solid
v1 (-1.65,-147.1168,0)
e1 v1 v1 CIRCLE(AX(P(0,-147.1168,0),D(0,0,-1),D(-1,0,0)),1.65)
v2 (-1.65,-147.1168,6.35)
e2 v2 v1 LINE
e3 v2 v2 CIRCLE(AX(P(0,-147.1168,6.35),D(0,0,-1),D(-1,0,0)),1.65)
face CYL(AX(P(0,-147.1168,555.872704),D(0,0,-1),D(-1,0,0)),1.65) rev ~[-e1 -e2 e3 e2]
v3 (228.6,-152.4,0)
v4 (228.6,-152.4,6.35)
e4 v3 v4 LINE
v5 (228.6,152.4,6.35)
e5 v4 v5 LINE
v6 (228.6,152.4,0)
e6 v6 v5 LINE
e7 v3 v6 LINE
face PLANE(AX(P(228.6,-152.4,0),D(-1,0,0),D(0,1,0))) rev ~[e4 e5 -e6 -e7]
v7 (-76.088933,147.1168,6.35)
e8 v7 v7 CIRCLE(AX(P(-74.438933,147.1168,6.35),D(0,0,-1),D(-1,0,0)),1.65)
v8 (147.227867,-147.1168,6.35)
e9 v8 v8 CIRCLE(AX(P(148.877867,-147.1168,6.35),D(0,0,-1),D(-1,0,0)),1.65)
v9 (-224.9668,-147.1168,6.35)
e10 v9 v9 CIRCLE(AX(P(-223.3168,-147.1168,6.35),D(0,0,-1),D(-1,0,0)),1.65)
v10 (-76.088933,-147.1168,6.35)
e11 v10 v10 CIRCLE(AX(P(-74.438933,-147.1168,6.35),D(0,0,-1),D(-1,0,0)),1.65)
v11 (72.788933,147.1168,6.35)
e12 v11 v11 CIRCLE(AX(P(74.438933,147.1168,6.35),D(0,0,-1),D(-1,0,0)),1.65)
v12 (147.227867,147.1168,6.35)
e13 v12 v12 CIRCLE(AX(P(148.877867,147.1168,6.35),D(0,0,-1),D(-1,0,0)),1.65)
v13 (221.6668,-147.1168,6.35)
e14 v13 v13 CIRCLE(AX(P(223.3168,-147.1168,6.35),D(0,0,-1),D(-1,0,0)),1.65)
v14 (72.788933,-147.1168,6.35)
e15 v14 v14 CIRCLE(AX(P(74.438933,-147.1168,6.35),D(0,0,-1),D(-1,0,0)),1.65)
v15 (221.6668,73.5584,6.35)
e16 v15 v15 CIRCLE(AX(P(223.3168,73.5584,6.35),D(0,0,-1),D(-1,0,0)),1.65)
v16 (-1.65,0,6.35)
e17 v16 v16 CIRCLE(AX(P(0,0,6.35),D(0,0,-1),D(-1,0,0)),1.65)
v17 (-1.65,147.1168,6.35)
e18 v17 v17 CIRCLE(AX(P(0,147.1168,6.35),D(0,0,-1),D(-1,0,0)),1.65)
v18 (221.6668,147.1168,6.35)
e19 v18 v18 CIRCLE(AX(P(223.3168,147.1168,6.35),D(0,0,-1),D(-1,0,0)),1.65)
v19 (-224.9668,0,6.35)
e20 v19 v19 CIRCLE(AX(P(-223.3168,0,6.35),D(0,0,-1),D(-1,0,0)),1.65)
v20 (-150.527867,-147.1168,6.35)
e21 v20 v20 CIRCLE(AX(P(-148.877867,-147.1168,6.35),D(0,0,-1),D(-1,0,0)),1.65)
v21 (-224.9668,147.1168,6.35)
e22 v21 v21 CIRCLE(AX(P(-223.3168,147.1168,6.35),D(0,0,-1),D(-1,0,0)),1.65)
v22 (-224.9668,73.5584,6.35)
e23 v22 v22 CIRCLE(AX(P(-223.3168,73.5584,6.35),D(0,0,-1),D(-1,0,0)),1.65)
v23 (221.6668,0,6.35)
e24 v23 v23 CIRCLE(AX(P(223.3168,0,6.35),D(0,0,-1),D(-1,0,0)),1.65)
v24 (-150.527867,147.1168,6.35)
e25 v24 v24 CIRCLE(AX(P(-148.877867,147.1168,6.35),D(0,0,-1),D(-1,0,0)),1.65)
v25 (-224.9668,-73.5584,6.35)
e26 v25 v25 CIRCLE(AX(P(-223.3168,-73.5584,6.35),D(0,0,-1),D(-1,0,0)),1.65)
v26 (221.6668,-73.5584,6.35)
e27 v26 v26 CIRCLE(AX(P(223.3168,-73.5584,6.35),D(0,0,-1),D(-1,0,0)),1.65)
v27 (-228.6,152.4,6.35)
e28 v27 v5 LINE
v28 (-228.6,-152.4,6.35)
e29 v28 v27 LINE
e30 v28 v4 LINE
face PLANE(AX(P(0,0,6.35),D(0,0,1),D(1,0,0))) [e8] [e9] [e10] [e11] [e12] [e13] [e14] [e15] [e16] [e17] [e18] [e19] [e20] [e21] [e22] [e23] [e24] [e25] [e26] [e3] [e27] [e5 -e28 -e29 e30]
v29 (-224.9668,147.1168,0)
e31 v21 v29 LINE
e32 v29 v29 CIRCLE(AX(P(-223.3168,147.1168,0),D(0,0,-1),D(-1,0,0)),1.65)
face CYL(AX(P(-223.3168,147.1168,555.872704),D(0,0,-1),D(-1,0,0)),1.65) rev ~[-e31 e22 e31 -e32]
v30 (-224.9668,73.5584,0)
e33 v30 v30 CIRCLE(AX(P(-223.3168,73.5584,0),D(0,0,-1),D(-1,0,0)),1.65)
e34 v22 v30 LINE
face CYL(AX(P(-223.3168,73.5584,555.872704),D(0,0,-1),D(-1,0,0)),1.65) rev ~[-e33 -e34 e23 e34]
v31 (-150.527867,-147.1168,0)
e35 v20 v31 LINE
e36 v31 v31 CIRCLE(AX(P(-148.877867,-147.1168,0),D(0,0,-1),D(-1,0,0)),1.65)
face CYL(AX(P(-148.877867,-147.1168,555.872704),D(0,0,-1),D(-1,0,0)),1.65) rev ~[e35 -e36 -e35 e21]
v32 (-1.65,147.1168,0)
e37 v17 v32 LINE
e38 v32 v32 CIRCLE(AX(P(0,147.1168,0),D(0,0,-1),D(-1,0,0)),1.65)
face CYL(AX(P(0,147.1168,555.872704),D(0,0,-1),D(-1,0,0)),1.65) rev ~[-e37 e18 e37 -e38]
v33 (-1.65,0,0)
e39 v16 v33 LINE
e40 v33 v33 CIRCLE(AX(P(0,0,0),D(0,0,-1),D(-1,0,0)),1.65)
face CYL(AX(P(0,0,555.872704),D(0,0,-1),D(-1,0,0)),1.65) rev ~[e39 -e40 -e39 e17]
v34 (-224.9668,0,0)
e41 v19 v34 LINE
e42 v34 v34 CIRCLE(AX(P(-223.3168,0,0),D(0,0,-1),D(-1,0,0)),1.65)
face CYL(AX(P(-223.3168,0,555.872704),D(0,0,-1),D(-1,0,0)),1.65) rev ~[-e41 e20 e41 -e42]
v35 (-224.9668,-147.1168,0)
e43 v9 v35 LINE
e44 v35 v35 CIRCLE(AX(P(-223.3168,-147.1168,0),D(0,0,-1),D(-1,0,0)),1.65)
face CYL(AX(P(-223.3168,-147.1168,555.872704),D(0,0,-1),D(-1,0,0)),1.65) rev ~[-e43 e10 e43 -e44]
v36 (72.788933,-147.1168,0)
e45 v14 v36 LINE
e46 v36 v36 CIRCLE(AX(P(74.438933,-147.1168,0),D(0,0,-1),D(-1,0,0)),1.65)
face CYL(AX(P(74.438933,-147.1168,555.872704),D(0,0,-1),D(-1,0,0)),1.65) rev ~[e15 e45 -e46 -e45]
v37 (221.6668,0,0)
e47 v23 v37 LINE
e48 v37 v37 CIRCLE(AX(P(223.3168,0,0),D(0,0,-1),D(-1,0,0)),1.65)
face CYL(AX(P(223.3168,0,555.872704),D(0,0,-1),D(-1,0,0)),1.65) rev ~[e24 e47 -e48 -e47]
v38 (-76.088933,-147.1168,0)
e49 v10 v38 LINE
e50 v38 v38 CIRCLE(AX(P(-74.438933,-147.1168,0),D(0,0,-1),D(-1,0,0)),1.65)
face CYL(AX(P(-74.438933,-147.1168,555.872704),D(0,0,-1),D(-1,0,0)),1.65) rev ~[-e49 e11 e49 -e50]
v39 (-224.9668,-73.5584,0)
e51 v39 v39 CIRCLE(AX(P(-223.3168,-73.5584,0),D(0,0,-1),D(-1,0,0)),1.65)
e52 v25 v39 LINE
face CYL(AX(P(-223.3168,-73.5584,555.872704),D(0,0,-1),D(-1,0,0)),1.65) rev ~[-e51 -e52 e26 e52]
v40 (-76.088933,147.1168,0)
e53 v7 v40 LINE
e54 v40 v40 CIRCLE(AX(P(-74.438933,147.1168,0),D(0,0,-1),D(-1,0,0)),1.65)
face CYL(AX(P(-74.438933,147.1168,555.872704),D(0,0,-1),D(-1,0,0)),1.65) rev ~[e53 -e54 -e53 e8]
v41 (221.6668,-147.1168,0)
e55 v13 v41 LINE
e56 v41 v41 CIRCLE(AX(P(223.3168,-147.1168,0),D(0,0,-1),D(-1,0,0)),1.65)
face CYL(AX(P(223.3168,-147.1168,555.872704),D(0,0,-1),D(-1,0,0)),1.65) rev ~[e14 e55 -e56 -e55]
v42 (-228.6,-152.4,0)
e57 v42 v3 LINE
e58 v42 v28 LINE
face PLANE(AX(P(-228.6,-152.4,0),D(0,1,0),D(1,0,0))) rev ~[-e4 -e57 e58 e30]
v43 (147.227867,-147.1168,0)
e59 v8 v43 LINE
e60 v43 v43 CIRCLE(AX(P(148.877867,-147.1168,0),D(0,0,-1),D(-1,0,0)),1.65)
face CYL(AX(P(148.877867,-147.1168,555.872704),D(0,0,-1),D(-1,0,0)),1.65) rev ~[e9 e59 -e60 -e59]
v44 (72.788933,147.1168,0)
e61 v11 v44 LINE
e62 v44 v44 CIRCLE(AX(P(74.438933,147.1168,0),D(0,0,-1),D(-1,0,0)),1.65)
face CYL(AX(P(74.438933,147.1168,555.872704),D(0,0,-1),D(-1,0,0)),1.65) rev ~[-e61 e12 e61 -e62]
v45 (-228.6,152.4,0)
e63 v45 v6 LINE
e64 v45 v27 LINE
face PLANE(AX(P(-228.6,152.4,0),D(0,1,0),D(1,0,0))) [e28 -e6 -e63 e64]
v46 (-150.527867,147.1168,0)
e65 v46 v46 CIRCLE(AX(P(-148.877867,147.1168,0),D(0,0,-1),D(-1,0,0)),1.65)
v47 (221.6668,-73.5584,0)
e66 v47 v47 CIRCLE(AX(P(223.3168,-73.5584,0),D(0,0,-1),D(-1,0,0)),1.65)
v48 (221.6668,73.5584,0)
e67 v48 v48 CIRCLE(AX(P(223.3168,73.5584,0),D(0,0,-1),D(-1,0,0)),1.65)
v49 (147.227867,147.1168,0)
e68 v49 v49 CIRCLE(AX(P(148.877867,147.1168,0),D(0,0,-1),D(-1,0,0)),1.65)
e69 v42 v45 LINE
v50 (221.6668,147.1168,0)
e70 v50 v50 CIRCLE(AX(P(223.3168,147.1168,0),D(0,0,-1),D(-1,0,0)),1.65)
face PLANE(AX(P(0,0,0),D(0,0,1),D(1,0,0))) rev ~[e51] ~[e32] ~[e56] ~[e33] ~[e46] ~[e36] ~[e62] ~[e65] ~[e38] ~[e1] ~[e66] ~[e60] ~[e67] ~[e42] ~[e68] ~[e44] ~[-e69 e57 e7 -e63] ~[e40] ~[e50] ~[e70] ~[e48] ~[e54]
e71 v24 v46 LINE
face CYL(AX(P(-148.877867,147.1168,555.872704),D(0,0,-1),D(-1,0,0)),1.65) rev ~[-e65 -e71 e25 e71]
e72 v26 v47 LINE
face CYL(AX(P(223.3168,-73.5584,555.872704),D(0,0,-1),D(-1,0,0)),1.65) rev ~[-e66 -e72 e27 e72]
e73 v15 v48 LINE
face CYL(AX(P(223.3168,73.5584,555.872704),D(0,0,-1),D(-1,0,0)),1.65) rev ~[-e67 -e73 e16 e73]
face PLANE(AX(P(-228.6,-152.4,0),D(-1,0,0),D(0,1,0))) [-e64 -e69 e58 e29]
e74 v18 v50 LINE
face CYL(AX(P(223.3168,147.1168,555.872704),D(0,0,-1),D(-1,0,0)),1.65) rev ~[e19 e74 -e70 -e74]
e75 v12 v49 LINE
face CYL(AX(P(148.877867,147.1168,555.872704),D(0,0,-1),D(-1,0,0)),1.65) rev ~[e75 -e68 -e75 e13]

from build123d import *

# Parameters (mm, degrees)
F1_W     = 457.2
F1_H     = 304.8
F2_DEPTH = 6.35
F4_D     = 3.3


# Not quite as in the source:
# - a variable given as a bare number and used for a length is read in inches; the dataset says mm whatever the document's units were


with BuildPart() as f2:
    # F1 (on Top) → F2 (new body)
    with BuildSketch(Plane.XY):
        Rectangle(F1_W, F1_H)
    extrude(amount=F2_DEPTH)

    # F4 (through all)
    with Locations(Plane.XY.offset(6.35)):
        with Locations((-223.3168, 147.1168), (-148.8778666667, 147.1168), (-74.4389333333, 147.1168), (0, 147.1168), (74.4389333333, 147.1168), (148.8778666667, 147.1168), (223.3168, 147.1168), (223.3168, 73.5584), (223.3168, 0), (223.3168, -73.5584), (223.3168, -147.1168), (148.8778666667, -147.1168), (74.4389333333, -147.1168), (0, -147.1168), (-74.4389333333, -147.1168), (-148.8778666667, -147.1168), (-223.3168, -73.5584), (-223.3168, -147.1168), (-223.3168, 0), (-223.3168, 73.5584), (0, 0)):
            Hole(F4_D / 2)


solid = f2.part
